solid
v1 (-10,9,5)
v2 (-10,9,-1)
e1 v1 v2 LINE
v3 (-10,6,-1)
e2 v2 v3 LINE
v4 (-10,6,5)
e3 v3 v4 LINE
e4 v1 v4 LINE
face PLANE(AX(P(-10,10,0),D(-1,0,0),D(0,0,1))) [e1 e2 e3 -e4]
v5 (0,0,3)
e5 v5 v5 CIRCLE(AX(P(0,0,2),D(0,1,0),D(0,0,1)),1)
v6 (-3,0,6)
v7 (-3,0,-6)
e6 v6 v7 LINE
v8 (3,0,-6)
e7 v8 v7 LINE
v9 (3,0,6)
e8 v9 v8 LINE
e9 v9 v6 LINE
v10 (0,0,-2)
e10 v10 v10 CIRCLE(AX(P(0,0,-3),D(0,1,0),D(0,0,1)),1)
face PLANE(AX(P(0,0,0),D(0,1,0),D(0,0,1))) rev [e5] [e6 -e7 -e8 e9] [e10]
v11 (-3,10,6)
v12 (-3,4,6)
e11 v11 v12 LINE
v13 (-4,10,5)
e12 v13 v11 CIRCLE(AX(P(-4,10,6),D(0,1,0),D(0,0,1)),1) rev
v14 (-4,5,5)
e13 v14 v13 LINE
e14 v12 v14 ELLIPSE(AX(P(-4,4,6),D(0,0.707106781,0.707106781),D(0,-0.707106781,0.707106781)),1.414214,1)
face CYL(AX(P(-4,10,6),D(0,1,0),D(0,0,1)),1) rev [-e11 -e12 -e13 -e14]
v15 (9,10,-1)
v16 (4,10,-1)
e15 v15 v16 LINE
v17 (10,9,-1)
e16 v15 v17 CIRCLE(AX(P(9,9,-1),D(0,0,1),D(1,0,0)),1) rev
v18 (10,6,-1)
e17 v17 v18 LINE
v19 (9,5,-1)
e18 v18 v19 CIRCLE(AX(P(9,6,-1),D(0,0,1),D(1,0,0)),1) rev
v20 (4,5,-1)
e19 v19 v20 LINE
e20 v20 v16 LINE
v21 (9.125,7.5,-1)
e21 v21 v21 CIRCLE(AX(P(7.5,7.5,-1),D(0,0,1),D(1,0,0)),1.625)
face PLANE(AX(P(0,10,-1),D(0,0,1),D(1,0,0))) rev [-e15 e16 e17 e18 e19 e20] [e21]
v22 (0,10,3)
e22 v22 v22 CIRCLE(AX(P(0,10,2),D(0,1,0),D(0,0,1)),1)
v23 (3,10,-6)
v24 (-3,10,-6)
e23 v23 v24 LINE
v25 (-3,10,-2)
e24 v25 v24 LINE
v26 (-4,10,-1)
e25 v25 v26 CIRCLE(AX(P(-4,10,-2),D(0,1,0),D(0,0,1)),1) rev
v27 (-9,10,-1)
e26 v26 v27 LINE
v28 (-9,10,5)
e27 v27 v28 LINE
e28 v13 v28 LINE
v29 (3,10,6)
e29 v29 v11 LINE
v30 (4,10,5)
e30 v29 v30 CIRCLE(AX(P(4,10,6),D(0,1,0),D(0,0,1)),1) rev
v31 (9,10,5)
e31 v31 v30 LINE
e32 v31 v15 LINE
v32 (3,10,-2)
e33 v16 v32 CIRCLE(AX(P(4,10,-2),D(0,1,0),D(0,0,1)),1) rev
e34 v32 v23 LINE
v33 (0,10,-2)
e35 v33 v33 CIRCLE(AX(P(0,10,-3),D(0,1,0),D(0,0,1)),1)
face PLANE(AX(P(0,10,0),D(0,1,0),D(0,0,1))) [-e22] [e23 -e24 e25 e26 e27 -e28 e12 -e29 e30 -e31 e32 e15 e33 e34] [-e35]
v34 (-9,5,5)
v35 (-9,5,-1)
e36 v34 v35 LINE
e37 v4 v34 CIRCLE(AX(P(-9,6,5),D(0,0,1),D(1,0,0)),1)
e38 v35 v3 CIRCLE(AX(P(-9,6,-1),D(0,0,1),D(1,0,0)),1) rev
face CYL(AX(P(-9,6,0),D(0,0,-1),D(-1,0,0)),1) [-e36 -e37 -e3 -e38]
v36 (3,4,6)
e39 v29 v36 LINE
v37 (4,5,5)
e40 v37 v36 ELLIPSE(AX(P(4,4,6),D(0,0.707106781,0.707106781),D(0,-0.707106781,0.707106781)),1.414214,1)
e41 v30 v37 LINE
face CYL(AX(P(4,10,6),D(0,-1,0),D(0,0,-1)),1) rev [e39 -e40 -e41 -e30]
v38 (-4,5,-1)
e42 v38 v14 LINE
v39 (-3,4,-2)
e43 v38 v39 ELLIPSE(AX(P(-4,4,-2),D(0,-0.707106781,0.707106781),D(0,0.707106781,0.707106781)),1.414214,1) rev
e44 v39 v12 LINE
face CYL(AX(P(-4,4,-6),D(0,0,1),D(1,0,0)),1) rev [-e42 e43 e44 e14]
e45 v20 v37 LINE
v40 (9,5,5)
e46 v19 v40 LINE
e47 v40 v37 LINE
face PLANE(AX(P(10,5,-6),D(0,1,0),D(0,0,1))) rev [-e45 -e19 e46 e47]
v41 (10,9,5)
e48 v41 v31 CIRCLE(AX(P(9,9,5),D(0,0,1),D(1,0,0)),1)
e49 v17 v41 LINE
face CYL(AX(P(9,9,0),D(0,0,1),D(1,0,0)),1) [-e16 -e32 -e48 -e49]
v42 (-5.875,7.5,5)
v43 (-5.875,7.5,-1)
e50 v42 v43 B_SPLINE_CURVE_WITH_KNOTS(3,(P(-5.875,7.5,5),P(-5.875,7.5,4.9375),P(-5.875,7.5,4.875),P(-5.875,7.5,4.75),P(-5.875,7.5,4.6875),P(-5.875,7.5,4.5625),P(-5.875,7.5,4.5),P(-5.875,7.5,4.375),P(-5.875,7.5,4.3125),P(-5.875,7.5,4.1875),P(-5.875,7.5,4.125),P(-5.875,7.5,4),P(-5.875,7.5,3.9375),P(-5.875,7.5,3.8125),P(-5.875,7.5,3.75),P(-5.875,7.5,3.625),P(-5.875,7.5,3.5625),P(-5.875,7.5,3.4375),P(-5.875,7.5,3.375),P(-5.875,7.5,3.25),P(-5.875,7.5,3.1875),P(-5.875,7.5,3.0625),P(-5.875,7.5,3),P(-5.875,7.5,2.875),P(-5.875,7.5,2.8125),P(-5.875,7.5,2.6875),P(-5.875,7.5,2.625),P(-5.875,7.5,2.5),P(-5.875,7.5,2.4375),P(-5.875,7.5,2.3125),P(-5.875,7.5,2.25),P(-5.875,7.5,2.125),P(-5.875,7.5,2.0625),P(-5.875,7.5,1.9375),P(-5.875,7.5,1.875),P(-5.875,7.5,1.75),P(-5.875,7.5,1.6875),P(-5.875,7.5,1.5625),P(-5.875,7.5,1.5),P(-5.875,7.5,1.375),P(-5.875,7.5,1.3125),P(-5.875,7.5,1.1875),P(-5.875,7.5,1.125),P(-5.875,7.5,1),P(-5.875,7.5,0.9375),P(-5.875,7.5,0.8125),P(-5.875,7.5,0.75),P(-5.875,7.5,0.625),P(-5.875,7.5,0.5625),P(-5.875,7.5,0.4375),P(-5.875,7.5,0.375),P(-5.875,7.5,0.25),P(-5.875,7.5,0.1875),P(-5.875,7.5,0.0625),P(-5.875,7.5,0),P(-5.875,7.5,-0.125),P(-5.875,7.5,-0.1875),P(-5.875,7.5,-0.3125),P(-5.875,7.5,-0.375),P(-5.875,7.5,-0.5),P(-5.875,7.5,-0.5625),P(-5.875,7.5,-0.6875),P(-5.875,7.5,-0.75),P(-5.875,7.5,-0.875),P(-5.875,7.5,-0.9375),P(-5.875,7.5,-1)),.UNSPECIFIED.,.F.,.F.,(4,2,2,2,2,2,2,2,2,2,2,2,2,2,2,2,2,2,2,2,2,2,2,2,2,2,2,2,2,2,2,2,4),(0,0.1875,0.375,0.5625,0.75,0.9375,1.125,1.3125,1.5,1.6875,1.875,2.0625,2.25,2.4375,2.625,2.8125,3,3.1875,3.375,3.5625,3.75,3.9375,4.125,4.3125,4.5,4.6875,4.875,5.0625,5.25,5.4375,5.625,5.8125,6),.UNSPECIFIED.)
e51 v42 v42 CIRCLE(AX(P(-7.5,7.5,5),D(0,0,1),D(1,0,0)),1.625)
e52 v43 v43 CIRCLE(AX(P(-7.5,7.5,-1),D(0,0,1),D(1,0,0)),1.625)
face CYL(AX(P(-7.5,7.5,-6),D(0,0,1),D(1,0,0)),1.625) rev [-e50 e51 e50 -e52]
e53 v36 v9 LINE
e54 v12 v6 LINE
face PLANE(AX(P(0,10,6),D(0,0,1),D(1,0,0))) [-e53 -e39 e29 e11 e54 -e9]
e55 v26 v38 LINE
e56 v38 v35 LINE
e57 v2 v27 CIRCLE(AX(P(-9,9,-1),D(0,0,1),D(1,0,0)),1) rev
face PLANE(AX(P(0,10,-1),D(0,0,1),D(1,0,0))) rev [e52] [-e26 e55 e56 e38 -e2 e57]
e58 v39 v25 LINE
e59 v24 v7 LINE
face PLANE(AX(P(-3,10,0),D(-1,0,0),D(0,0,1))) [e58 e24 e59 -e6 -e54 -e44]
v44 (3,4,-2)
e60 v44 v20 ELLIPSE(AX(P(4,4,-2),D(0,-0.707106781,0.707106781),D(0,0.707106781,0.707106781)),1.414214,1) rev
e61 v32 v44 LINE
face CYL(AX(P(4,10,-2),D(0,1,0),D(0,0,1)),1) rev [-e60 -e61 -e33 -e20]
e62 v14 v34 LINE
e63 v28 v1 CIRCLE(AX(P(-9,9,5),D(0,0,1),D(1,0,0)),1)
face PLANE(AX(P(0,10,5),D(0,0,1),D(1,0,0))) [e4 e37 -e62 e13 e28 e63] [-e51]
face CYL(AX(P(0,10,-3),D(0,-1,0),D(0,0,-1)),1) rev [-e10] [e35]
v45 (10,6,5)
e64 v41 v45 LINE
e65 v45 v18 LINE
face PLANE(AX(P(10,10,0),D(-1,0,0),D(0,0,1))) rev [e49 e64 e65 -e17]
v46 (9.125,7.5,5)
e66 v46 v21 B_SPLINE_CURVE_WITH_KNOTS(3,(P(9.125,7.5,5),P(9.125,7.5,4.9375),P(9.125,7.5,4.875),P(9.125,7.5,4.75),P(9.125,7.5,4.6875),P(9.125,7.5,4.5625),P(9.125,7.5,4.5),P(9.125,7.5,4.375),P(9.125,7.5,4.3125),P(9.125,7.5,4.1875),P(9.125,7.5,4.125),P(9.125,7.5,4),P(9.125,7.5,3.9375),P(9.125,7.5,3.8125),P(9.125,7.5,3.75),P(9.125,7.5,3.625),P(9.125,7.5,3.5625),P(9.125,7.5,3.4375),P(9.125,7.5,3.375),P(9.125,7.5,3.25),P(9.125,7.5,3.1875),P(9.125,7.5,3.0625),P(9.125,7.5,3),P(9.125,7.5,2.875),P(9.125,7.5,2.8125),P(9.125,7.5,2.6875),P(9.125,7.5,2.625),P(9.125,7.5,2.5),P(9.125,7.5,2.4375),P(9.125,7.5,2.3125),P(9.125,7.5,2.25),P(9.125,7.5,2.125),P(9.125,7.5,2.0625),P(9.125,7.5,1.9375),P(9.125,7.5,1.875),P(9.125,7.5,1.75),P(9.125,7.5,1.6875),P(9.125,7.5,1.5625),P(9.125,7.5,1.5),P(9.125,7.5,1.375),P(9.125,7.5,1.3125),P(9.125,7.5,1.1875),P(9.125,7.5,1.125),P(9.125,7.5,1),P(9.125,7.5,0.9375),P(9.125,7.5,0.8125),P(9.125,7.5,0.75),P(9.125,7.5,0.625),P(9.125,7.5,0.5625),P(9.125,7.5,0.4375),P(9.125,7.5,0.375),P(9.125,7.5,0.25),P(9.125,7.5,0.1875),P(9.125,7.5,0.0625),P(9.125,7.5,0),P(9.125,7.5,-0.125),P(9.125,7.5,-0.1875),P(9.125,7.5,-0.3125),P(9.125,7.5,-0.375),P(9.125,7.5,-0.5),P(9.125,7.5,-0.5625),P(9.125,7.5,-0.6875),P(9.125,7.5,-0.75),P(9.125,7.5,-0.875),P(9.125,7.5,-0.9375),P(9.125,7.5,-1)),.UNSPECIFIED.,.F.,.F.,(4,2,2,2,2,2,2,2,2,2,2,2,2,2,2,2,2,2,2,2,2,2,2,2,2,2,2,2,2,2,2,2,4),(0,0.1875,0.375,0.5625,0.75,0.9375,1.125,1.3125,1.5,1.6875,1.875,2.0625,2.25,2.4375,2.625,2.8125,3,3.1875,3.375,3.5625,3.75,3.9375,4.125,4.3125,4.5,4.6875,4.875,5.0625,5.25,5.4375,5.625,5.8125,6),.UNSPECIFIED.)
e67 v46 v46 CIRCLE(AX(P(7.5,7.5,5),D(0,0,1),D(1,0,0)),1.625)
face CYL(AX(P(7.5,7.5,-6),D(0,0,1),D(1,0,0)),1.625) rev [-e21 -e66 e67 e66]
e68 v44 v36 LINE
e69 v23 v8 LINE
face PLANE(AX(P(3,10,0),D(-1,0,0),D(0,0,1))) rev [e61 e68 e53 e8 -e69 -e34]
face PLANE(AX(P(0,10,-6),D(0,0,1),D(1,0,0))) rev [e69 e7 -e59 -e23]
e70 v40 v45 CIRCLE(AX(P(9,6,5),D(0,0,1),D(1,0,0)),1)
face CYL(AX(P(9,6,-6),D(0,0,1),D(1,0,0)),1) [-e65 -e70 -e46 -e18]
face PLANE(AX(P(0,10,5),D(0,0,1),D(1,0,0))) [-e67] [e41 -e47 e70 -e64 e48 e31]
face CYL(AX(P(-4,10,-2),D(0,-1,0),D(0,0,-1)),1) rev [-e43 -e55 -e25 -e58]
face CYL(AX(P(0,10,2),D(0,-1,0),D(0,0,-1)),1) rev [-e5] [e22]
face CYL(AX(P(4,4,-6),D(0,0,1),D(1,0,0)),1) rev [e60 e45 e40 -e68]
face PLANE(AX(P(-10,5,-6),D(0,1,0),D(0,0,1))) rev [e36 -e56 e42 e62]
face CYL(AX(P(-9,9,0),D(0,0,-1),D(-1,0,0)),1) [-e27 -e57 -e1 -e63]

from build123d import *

# Parameters (mm, degrees)
SKETCH2_W               = 6
SKETCH2_H               = 12
SKETCH2_W_2             = 20
SKETCH2_H_2             = 6
BOSS_EXTRUDE1_DEPTH     = 10
SKETCH6_R               = 1
CUT_EXTRUDE2_DEPTH      = 16.362291496
CUT_EXTRUDE4_DEPTH      = 16.362291496
CUT_EXTRUDE4_DEPTH_BACK = 16.362291496
SKETCH7_R               = 1.625
FILLET1_R               = 1


with BuildPart() as part:
    # Sketch2 → Boss-Extrude1 (new body)
    with BuildSketch(Plane(origin=(0, 0, 0), x_dir=(1, 0, 0), z_dir=(0, 1, 0))):
        Rectangle(SKETCH2_W, SKETCH2_H)
        with Locations((0, -2)):
            Rectangle(SKETCH2_W_2, SKETCH2_H_2)
    extrude(amount=BOSS_EXTRUDE1_DEPTH)

    # Sketch6 → Cut-Extrude2 (cut, through all)
    with BuildSketch(Plane(origin=(0, 0, 0), x_dir=(1, 0, 0), z_dir=(0, 1, 0))):
        with Locations(Location((0, 3, 0), (0, 0, 270))):
            Circle(SKETCH6_R)
        with Locations(Location((0, -2, 0), (0, 0, 270))):
            Circle(SKETCH6_R)
    extrude(amount=CUT_EXTRUDE2_DEPTH, mode=Mode.SUBTRACT)

    # Sketch7 → Cut-Extrude4 (cut, two sides: drawn at the far end of the back side and taken through both)
    with BuildSketch(Plane.XY.offset(-CUT_EXTRUDE4_DEPTH_BACK)):
        with Locations((-7.5, 7.5)):
            Circle(SKETCH7_R)
        with Locations((7.5, 7.5)):
            Circle(SKETCH7_R)
        with BuildLine():
            Line((-10, 0), (-3, 0))
            Line((-3, 0), (-3, 4))
            ThreePointArc((-3, 4), (-3.292893219, 4.707106781), (-4, 5))
            Line((-4, 5), (-10, 5))
            Line((-10, 5), (-10, 0))
        make_face()
        with BuildLine():
            Line((3, 0), (3, 4))
            ThreePointArc((3, 4), (3.292893219, 4.707106781), (4, 5))
            Line((4, 5), (10, 5))
            Line((10, 5), (10, 0))
            Line((10, 0), (3, 0))
        make_face()
    extrude(amount=CUT_EXTRUDE4_DEPTH + CUT_EXTRUDE4_DEPTH_BACK, mode=Mode.SUBTRACT)

    # Fillet1
    fillet1_edges = [part.edges().sort_by_distance(p)[0] for p in [
        (10, 5, 2),
        (10, 10, 2),
        (-10, 5, 2),
        (-10, 10, 2),
        (-3, 7, 5),
        (3, 7, 5),
        (3, 7, -1),
        (-3, 7, -1),
    ]]
    fillet(fillet1_edges, radius=FILLET1_R - 0.0001)  # a hair under: the kernel refuses the full size


solid = part.part
